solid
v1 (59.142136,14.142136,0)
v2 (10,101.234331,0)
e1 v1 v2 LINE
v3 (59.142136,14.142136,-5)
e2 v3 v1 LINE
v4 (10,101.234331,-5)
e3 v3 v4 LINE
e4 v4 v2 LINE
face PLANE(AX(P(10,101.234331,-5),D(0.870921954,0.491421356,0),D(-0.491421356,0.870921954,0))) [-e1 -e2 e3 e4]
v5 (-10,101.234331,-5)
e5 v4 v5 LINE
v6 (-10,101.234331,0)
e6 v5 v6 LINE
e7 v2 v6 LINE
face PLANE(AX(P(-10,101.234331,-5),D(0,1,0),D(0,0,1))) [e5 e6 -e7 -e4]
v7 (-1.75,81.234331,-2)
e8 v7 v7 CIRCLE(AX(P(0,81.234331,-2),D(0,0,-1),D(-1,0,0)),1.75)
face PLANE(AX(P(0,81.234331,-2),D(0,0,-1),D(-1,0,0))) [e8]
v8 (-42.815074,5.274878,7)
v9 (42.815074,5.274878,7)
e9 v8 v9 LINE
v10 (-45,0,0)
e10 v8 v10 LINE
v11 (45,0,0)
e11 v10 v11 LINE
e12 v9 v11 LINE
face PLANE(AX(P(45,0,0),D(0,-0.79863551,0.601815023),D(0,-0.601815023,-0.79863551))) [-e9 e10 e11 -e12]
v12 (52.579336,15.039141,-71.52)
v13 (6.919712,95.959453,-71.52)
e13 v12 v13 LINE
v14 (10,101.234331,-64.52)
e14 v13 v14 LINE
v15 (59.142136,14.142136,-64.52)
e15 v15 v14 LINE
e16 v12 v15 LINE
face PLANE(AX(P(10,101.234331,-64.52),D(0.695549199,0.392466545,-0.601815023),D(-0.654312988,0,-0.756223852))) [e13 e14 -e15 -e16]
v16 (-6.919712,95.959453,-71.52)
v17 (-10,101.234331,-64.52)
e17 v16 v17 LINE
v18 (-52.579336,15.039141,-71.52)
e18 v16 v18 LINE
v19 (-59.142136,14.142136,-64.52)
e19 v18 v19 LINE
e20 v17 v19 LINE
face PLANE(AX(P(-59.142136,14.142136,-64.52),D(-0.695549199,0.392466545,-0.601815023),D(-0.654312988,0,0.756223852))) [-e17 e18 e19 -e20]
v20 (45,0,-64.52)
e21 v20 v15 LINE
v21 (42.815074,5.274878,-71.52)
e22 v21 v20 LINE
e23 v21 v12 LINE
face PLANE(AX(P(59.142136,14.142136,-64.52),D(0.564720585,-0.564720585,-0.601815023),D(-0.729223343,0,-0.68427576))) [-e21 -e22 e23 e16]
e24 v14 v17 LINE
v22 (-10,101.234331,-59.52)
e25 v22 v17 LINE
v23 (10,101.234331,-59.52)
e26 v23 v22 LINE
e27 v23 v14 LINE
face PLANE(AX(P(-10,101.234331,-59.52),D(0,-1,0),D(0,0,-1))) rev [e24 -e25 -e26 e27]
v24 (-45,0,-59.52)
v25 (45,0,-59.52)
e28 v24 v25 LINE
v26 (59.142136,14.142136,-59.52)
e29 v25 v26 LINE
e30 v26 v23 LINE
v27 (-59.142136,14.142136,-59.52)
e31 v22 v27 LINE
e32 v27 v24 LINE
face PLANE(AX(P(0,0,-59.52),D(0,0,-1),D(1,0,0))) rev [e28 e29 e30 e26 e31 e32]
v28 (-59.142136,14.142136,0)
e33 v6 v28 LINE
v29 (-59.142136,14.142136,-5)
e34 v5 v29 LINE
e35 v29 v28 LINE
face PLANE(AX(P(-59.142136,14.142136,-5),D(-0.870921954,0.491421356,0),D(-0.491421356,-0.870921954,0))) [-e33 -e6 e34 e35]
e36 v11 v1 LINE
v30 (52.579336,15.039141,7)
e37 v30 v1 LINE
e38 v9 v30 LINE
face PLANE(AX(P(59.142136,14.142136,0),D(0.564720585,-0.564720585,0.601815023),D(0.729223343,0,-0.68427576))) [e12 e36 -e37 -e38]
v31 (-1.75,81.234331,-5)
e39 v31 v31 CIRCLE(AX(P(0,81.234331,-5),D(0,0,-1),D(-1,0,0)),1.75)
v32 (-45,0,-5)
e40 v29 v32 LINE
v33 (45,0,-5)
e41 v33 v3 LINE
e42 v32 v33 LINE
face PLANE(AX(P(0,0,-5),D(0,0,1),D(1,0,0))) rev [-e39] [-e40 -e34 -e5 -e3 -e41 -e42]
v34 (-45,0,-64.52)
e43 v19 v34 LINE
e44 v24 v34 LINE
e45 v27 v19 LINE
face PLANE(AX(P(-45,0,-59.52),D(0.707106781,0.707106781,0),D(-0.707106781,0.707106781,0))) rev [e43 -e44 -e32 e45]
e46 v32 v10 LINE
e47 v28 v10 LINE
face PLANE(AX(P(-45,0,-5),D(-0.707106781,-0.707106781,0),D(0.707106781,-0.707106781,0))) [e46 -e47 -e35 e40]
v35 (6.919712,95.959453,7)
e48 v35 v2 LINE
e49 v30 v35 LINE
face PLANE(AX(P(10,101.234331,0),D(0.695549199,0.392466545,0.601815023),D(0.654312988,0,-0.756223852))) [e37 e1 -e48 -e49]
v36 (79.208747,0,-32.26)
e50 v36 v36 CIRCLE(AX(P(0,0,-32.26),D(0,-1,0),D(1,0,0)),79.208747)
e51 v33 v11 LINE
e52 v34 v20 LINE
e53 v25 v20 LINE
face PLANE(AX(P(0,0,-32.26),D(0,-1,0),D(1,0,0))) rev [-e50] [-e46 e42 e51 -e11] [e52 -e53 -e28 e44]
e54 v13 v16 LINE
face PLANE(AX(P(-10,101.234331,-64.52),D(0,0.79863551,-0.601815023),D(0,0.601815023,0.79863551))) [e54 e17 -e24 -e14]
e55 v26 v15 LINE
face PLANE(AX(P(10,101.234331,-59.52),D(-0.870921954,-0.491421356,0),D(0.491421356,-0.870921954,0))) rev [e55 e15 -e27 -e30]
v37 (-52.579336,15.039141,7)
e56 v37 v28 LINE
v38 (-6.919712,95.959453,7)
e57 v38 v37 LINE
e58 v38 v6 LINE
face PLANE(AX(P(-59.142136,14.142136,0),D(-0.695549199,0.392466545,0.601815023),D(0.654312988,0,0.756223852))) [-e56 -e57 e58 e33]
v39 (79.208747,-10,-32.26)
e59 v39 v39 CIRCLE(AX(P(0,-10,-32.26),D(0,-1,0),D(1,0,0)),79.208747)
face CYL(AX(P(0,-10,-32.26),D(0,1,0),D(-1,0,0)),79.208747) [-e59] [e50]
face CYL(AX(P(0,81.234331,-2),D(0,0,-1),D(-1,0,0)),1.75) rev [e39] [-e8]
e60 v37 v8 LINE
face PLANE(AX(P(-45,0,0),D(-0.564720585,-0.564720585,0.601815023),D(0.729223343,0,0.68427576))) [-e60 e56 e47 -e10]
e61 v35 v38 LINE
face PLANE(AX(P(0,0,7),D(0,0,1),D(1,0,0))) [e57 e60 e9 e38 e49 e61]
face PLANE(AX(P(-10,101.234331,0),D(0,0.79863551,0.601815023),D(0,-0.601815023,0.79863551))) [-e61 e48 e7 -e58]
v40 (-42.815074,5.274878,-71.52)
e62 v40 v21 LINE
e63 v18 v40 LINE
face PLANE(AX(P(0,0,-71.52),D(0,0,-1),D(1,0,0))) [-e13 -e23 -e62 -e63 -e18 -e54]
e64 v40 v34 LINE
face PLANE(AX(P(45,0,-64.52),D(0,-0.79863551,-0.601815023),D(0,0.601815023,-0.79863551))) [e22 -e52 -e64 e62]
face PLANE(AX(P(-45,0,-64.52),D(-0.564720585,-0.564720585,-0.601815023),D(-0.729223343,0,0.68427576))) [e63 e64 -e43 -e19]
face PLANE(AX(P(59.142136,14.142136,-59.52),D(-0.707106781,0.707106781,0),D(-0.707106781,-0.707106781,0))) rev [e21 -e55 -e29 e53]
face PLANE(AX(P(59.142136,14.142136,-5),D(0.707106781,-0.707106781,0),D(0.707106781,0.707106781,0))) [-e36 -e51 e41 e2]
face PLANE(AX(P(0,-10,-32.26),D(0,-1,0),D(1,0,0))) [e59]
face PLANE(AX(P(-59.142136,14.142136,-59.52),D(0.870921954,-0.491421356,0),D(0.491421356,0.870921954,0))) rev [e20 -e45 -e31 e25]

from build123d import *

# Parameters (mm, degrees)
BOSS_EXTRUDE1_DEPTH           = 7
BOSS_EXTRUDE1_TAPER           = 37
BOSS_EXTRUDE1_OTHER_WAY_DEPTH = 5
SKETCH2_R                     = 1.75
CUT_EXTRUDE1_DEPTH            = 3
SKETCH3_R                     = 79.208746666
BOSS_EXTRUDE2_DEPTH           = 10
MIRROR1_START                 = -64.52
MIRROR1_DEPTH                 = 5


with BuildPart() as part:
    # Sketch1 → Boss-Extrude1 (new body)
    with BuildSketch(Plane.XY):
        Polygon((-10, 101.234331062), (-59.142135624, 14.142135624), (-45, 0), (45, 0), (59.142135624, 14.142135624), (10, 101.234331062), align=None)
    extrude(amount=BOSS_EXTRUDE1_DEPTH, taper=BOSS_EXTRUDE1_TAPER)

    # Sketch1 → Boss-Extrude1 other way (add)
    with BuildSketch(Plane.XY):
        Polygon((-10, 101.234331062), (-59.142135624, 14.142135624), (-45, 0), (45, 0), (59.142135624, 14.142135624), (10, 101.234331062), align=None)
    extrude(amount=-BOSS_EXTRUDE1_OTHER_WAY_DEPTH)

    # Sketch2 → Cut-Extrude1 (cut)
    with BuildSketch(Plane(origin=(0, 0, -5), x_dir=(-1, 0, 0), z_dir=(0, 0, -1))):
        with Locations((0, 81.234331062)):
            Circle(SKETCH2_R)
    extrude(amount=-CUT_EXTRUDE1_DEPTH, mode=Mode.SUBTRACT)

    # Sketch3 → Boss-Extrude2 (add)
    with BuildSketch(Plane.XZ):
        with Locations((0, -32.26)):
            Circle(SKETCH3_R)
    extrude(amount=BOSS_EXTRUDE2_DEPTH)

    # Mirror1: read off the stored shape, not the designer's step
    # Mirror1 outline → Mirror1 (add)
    with BuildSketch(Plane.XY.offset(MIRROR1_START)):
        Polygon((-10, 101.234331062), (-59.142135624, 14.142135624), (-45, 0), (45, 0), (59.142135624, 14.142135624), (10, 101.234331062), align=None)
    extrude(amount=MIRROR1_DEPTH)

    # Mirror1 2: loft between two sections, ruled curve by curve
    mirror1_2_from = [
        Edge.make_line((-10, 101.234331062, -64.52), (-59.142135624, 14.142135624, -64.52)),
        Edge.make_line((10, 101.234331062, -64.52), (-10, 101.234331062, -64.52)),
        Edge.make_line((59.142135624, 14.142135624, -64.52), (10, 101.234331062, -64.52)),
        Edge.make_line((45, 0, -64.52), (59.142135624, 14.142135624, -64.52)),
        Edge.make_line((-45, 0, -64.52), (45, 0, -64.52)),
        Edge.make_line((-59.142135624, 14.142135624, -64.52), (-45, 0, -64.52)),
    ]
    mirror1_2_to = [
        Edge.make_line((-6.919711963, 95.959452712, -71.52), (-52.579336418, 15.039140921, -71.52)),
        Edge.make_line((6.919711963, 95.959452712, -71.52), (-6.919711963, 95.959452712, -71.52)),
        Edge.make_line((52.579336418, 15.039140921, -71.52), (6.919711963, 95.959452712, -71.52)),
        Edge.make_line((42.815073847, 5.274878351, -71.52), (52.579336418, 15.039140921, -71.52)),
        Edge.make_line((-42.815073847, 5.274878351, -71.52), (42.815073847, 5.274878351, -71.52)),
        Edge.make_line((-52.579336418, 15.039140921, -71.52), (-42.815073847, 5.274878351, -71.52)),
    ]
    mirror1_2 = Solid(Shell([*[Face.make_surface_from_curves(mirror1_2_from[k], mirror1_2_to[k]) for k in range(6)], Face(Wire(mirror1_2_from)), Face(Wire(mirror1_2_to))]))
    add(mirror1_2)


solid = part.part
